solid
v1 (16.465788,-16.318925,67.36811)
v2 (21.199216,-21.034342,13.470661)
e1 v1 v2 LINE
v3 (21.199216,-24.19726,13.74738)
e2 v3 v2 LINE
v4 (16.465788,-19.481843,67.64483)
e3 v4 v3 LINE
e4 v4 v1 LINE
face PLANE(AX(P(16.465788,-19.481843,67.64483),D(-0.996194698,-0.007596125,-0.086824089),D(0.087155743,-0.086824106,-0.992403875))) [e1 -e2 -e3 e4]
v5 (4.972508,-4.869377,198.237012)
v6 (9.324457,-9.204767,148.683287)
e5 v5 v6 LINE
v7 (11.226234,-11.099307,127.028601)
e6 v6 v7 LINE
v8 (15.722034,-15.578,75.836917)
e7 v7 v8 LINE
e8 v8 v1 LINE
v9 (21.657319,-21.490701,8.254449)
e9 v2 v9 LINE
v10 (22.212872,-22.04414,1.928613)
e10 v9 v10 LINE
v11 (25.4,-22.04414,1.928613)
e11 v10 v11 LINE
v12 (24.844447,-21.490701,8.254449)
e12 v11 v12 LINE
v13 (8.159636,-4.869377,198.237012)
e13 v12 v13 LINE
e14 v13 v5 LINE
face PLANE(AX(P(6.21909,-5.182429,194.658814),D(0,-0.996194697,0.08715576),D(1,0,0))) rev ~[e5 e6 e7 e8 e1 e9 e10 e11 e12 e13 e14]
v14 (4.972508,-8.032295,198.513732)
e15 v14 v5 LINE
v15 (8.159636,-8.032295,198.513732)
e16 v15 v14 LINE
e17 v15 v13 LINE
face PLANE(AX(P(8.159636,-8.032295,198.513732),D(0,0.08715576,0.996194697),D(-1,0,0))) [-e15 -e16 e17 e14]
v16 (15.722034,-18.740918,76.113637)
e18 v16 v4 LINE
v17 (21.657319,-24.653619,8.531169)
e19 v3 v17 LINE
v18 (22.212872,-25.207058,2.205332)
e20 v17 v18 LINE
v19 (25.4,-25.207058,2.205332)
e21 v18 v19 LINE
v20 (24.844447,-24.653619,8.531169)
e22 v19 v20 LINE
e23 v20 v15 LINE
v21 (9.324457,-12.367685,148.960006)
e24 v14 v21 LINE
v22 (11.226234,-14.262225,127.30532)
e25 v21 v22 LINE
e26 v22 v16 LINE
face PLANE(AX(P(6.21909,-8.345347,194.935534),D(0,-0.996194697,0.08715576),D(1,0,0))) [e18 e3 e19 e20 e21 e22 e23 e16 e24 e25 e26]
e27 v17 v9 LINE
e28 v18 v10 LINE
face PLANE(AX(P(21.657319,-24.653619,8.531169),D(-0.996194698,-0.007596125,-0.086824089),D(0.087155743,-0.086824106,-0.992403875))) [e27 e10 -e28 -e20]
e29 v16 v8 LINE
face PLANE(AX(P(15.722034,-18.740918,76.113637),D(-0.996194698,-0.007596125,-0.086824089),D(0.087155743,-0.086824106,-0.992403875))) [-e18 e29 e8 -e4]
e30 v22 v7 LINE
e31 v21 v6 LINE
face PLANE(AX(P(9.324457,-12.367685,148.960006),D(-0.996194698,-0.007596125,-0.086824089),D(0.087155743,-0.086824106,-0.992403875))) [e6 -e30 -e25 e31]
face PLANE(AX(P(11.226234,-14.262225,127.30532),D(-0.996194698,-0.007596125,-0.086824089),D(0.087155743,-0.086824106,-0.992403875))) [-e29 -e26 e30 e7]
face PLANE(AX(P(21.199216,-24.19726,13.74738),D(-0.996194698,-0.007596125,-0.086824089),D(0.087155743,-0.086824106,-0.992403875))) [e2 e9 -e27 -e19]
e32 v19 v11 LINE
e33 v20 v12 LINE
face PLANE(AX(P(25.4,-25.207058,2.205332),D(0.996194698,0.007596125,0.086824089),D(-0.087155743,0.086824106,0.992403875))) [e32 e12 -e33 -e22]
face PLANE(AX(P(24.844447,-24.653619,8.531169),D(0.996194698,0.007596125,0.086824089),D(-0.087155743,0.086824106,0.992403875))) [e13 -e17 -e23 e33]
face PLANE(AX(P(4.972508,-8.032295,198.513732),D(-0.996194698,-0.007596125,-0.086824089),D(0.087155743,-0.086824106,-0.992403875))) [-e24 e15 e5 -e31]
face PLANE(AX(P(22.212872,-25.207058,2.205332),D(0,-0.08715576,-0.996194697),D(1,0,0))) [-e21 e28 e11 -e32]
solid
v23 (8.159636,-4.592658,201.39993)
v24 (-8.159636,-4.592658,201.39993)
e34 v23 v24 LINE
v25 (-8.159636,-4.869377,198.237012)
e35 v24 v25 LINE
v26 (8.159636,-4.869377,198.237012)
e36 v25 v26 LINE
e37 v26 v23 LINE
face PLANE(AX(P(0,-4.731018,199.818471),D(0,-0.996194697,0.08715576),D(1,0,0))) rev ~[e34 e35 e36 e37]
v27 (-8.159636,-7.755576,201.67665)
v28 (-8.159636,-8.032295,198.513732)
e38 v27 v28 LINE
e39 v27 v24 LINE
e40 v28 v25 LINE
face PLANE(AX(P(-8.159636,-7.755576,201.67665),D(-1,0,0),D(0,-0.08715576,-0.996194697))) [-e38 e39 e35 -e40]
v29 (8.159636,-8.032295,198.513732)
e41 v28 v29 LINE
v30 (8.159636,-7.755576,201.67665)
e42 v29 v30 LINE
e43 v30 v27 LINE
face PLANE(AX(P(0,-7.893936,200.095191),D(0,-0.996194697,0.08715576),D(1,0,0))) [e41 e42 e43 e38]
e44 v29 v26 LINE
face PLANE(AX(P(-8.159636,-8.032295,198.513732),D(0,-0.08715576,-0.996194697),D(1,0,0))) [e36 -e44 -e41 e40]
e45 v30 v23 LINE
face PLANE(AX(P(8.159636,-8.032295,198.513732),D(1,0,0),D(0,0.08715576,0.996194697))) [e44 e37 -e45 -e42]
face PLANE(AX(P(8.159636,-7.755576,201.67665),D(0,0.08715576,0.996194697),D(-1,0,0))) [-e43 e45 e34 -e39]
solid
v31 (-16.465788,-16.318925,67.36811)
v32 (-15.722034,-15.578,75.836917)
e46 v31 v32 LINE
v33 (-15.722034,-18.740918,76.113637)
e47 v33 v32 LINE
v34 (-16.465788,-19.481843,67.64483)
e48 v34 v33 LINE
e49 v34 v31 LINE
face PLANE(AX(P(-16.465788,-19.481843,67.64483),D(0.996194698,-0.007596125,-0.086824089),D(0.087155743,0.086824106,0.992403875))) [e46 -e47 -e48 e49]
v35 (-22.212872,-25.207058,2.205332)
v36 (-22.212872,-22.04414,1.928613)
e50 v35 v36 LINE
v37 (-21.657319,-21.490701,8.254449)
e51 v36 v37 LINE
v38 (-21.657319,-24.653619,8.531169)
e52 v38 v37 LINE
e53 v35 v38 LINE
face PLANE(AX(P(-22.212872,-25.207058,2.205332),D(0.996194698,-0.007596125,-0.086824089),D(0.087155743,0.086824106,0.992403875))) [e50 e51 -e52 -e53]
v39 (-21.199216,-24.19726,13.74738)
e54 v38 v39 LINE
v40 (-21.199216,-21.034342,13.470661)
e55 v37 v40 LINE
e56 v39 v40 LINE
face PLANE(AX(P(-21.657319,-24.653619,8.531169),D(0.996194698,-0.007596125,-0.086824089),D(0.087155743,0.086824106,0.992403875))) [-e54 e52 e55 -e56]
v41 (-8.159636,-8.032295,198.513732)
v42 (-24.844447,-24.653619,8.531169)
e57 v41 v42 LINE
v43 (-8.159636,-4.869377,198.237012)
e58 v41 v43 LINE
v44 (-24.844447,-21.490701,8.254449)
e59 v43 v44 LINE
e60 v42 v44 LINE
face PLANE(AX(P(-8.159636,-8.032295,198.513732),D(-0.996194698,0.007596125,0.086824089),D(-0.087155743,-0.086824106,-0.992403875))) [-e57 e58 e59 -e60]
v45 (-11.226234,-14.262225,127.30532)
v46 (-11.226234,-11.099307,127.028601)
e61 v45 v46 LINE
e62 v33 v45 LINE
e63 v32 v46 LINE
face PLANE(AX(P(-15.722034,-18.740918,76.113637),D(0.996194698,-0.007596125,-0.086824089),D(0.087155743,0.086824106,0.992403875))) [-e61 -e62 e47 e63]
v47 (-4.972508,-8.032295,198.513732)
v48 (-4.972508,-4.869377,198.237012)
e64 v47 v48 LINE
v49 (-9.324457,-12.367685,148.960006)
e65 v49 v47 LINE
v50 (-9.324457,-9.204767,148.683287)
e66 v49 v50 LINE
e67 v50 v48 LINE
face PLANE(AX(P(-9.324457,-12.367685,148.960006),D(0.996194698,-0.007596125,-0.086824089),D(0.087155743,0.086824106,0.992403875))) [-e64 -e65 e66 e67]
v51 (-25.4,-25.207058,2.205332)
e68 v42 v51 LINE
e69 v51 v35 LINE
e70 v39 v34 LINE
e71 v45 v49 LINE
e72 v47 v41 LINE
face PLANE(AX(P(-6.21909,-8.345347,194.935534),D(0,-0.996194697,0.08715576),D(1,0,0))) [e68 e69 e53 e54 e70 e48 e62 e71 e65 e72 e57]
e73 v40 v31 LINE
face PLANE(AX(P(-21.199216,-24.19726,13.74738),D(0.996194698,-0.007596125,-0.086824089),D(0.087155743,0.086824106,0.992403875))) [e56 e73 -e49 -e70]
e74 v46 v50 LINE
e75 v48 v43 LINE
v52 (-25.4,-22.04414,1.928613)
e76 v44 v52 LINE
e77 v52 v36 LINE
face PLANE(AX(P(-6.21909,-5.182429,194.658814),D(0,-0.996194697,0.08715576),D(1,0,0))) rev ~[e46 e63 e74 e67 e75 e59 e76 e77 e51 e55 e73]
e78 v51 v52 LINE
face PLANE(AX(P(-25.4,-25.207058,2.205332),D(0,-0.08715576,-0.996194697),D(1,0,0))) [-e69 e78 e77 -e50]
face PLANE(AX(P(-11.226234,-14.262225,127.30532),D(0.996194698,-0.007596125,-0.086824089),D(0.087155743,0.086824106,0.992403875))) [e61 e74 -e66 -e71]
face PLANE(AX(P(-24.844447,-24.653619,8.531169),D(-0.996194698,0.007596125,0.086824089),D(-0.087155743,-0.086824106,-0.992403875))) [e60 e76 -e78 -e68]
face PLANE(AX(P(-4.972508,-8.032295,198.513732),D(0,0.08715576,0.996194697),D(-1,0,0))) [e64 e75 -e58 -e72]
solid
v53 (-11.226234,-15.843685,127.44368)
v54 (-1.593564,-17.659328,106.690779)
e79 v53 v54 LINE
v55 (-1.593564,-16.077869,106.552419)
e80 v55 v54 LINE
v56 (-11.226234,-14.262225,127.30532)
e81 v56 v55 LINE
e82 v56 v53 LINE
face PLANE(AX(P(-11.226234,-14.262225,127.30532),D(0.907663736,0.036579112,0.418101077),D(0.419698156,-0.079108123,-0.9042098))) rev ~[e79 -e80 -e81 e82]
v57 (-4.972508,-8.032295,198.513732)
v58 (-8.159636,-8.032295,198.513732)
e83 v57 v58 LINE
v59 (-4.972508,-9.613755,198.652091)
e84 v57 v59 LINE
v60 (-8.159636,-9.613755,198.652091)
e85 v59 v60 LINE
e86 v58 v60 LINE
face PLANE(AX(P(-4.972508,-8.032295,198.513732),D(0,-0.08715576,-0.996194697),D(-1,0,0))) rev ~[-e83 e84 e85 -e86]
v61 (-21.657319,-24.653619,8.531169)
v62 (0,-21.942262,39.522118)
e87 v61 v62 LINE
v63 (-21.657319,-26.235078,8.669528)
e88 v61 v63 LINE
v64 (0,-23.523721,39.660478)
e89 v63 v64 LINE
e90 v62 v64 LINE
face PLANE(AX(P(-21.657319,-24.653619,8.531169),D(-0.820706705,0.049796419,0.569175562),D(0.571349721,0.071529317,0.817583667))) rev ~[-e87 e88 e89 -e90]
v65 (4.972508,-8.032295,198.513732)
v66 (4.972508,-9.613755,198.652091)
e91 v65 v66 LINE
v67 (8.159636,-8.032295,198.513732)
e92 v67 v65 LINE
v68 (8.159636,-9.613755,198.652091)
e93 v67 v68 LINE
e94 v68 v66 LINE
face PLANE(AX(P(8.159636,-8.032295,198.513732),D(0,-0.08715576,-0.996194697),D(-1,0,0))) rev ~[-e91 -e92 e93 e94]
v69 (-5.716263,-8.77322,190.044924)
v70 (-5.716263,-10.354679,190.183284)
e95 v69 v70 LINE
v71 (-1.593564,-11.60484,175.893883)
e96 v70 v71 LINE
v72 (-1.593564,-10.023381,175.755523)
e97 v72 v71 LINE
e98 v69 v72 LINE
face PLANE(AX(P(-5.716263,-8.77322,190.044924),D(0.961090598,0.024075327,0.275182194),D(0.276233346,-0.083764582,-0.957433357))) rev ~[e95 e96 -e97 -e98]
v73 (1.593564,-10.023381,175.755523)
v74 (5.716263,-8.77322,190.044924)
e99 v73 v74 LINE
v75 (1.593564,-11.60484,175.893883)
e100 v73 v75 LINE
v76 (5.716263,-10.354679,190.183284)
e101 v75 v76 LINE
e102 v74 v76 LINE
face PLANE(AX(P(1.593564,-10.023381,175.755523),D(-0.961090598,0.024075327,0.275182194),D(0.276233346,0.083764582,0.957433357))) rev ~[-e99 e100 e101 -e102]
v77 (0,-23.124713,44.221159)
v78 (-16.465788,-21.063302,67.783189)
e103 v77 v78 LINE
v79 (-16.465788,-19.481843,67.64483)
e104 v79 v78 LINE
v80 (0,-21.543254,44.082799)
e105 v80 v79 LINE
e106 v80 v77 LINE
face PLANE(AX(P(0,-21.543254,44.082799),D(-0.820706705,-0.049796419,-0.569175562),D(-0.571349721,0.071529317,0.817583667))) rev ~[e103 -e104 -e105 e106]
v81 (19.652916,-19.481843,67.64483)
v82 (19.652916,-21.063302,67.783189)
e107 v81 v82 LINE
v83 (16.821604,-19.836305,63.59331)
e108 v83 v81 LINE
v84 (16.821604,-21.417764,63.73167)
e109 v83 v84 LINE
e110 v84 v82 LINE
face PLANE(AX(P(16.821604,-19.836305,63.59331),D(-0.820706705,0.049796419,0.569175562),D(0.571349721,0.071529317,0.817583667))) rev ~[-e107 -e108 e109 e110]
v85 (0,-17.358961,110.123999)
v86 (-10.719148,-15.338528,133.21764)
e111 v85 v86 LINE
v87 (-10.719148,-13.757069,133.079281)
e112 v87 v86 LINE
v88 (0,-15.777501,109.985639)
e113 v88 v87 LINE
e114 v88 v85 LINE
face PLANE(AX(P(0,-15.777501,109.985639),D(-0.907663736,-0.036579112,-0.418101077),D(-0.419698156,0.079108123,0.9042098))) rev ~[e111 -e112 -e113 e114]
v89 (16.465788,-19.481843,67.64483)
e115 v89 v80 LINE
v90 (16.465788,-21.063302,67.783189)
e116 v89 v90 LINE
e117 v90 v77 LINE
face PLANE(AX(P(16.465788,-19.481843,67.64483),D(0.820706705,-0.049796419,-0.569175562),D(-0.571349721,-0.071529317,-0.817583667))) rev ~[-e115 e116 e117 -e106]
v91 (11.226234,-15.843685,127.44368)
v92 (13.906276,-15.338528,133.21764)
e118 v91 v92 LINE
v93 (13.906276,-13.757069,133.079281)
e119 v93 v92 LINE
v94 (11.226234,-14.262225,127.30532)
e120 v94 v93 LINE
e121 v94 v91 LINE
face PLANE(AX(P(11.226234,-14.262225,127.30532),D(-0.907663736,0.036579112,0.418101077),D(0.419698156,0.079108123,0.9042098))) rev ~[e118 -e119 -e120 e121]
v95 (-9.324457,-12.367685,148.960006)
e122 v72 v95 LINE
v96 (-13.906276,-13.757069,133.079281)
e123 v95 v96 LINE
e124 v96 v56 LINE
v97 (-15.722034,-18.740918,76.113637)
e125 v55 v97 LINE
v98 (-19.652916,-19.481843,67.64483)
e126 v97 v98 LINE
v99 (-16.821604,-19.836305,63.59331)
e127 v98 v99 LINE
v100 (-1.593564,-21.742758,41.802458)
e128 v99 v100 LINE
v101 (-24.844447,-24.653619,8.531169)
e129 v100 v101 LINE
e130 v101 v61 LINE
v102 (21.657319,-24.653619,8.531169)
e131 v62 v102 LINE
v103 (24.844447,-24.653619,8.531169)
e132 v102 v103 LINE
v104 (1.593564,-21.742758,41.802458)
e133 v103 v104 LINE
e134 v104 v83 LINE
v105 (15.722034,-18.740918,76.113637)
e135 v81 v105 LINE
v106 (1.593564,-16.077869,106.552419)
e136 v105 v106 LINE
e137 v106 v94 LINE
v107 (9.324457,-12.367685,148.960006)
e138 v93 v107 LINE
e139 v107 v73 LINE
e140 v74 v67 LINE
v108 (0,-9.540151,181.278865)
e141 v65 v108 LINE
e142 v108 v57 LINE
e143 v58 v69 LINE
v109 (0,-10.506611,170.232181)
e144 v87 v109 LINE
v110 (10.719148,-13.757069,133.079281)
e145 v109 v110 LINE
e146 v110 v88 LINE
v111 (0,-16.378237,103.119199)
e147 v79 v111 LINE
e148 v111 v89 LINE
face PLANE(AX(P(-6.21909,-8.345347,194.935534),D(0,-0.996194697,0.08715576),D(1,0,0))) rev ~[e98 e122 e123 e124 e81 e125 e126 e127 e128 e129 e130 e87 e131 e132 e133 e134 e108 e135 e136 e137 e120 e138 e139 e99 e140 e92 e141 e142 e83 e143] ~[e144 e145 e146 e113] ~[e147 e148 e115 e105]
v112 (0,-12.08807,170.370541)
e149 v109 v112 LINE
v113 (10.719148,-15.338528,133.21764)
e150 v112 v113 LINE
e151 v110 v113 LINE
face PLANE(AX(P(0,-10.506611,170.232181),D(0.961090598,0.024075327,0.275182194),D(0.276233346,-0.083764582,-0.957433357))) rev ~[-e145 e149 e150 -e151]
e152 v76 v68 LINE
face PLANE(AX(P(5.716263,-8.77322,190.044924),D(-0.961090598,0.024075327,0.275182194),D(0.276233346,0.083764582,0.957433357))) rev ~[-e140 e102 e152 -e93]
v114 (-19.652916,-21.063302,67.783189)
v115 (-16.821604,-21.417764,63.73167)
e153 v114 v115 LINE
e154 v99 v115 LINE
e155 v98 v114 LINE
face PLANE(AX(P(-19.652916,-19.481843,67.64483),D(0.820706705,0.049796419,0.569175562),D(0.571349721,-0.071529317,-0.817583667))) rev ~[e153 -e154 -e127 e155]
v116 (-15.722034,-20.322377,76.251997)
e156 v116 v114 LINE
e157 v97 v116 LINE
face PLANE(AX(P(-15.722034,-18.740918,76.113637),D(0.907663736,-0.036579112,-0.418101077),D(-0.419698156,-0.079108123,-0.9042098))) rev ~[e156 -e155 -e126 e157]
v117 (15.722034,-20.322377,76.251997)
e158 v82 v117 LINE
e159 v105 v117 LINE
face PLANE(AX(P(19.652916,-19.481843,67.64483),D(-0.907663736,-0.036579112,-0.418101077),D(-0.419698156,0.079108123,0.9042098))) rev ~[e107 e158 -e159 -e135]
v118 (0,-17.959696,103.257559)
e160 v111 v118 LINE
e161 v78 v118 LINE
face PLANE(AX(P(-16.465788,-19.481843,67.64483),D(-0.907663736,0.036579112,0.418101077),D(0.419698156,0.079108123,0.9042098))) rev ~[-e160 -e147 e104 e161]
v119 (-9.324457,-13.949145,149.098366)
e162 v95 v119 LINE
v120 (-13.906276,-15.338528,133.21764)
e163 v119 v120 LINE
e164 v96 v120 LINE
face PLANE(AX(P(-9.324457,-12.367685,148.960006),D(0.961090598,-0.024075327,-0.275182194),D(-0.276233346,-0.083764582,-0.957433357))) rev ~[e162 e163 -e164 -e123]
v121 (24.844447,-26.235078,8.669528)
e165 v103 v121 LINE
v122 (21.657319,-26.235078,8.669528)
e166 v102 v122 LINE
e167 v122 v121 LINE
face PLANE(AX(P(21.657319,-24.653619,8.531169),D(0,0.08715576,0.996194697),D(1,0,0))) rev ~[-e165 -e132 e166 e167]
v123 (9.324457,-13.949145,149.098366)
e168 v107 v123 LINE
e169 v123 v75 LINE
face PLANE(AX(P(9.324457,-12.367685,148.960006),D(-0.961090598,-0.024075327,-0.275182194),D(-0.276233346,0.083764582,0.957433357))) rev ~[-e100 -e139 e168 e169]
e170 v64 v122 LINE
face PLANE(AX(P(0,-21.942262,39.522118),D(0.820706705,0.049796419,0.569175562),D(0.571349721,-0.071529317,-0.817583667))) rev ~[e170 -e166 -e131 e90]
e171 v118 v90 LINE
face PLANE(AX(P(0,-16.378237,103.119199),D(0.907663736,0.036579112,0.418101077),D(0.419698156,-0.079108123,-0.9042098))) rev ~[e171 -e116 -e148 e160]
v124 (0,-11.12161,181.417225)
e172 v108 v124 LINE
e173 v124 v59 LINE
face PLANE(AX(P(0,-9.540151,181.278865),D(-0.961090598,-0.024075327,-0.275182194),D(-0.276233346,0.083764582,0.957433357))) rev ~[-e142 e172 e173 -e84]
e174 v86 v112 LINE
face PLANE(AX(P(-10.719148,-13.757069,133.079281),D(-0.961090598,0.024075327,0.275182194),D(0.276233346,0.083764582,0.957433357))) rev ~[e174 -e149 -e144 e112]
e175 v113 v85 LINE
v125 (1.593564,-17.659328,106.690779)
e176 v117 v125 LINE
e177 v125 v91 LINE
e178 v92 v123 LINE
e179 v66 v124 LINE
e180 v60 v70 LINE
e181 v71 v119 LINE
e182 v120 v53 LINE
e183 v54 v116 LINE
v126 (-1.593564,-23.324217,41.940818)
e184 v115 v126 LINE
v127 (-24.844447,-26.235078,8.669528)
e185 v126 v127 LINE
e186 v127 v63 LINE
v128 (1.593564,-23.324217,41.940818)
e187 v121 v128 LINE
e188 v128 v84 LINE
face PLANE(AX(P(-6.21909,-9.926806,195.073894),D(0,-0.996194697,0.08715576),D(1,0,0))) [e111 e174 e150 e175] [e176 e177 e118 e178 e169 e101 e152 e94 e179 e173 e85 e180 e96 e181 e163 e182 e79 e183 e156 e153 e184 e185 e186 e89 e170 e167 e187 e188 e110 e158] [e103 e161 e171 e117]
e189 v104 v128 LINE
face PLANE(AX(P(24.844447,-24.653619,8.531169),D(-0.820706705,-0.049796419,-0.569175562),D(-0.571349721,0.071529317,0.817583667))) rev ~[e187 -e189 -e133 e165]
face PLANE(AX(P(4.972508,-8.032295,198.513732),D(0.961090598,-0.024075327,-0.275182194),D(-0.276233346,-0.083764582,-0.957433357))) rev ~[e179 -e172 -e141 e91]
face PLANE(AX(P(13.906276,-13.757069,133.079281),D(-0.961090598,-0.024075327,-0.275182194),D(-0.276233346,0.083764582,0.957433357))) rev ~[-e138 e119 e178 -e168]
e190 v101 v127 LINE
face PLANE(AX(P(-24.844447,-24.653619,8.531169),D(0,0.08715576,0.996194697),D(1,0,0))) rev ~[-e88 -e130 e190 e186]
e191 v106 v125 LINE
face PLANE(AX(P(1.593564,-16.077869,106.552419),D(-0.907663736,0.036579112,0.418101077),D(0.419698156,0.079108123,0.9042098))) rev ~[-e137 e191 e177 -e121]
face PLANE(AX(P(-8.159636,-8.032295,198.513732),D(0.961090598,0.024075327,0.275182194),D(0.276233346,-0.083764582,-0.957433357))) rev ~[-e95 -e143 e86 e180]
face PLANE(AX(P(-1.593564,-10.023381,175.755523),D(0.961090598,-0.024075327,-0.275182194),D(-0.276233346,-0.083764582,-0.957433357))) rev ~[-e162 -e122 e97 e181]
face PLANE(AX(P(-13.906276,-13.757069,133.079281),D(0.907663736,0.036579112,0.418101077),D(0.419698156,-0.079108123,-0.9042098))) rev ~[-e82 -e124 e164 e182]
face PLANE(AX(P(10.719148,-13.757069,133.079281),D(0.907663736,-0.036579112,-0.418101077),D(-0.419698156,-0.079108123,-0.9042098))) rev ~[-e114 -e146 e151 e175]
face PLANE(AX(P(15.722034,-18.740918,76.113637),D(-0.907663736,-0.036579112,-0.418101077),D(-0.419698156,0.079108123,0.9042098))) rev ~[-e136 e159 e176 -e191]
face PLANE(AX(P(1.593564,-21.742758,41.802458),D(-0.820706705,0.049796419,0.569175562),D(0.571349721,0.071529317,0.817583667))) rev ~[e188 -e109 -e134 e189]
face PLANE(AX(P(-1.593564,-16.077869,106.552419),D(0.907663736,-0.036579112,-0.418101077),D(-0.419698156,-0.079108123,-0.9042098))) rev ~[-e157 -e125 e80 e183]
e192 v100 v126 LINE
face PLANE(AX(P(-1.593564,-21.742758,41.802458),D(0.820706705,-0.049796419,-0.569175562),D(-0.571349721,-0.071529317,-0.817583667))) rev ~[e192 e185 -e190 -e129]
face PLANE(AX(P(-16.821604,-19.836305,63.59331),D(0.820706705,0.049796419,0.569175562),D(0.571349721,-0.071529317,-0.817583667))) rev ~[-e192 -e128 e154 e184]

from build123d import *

# Parameters (mm, degrees)
F5_DEPTH = 3.175
F6_DEPTH = 3.175
F7_DEPTH = 1.5875


with BuildPart() as f5:
    # F4 (on line) → F5 (new body)
    with BuildSketch(Plane(origin=(0, -25.2070583861, 2.2053322939), x_dir=(1, 0, 0), z_dir=(0, -0.9961946966, 0.0871557602))):
        Polygon((-8.1596356954, 200.2332657202), (-8.1596356954, 197.0582657202), (-4.9725077112, 197.0582657202), (4.9725077112, 197.0582657202), (8.1596356954, 197.0582657202), (8.1596356954, 200.2332657202), align=None)
    extrude(amount=-F5_DEPTH)


with BuildPart() as f6:
    # F4 (on line) → F6 (new body)
    with BuildSketch(Plane(origin=(0, -25.2070583861, 2.2053322939), x_dir=(1, 0, 0), z_dir=(0, -0.9961946966, 0.0871557602))):
        Polygon((-4.9725077112, 197.0582657202), (-8.1596356954, 197.0582657202), (-5.7162625489, 188.5571090249), align=None)
        Polygon((-5.7162625489, 188.5571090249), (-8.1596356954, 197.0582657202), (-13.9062760659, 131.3738657202), (-9.3244573772, 147.3152534193), align=None)
        Polygon((-9.3244573772, 147.3152534193), (-13.9062760659, 131.3738657202), (-10.7191480817, 131.3738657202), align=None)
        Polygon((-10.7191480817, 131.3738657202), (-13.9062760659, 131.3738657202), (-11.2262337703, 125.5778497774), align=None)
        Polygon((-11.2262337703, 125.5778497774), (-13.9062760659, 131.3738657202), (-19.6529164364, 65.6894657202), (-15.7220336145, 74.1906224154), align=None)
        Polygon((-15.7220336145, 74.1906224154), (-19.6529164364, 65.6894657202), (-16.4657884522, 65.6894657202), align=None)
        Polygon((-16.4657884522, 65.6894657202), (-19.6529164364, 65.6894657202), (-16.8216044507, 61.6224702472), align=None)
        Polygon((-16.8216044507, 61.6224702472), (-19.6529164364, 65.6894657202), (-24.8444469866, 6.35), (-21.1992164113, 11.5861365765), align=None)
        Polygon((-21.1992164113, 11.5861365765), (-24.8444469866, 6.35), (-21.6573190024, 6.35), align=None)
        Polygon((-21.6573190024, 6.35), (-24.8444469866, 6.35), (-25.4, 0), (-22.2370818336, 0), (-22.2128720158, 0), align=None)
    extrude(amount=-F6_DEPTH)


with BuildPart() as f6b:
    # F4 (on line) → F6, piece 2 (new body)
    with BuildSketch(Plane(origin=(0, -25.2070583861, 2.2053322939), x_dir=(1, 0, 0), z_dir=(0, -0.9961946966, 0.0871557602))):
        Polygon((8.1596356954, 197.0582657202), (4.9725077112, 197.0582657202), (5.7162625489, 188.5571090249), align=None)
        Polygon((8.1596356954, 197.0582657202), (5.7162625489, 188.5571090249), (9.3244573772, 147.3152534193), (13.9062760659, 131.3738657202), align=None)
        Polygon((9.3244573772, 147.3152534193), (10.7191480817, 131.3738657202), (13.9062760659, 131.3738657202), align=None)
        Polygon((13.9062760659, 131.3738657202), (10.7191480817, 131.3738657202), (11.2262337703, 125.5778497774), align=None)
        Polygon((19.6529164364, 65.6894657202), (13.9062760659, 131.3738657202), (11.2262337703, 125.5778497774), (15.7220336145, 74.1906224154), align=None)
        Polygon((15.7220336145, 74.1906224154), (16.4657884522, 65.6894657202), (19.6529164364, 65.6894657202), align=None)
        Polygon((19.6529164364, 65.6894657202), (16.4657884522, 65.6894657202), (16.8216044507, 61.6224702472), align=None)
        Polygon((24.8444469866, 6.35), (19.6529164364, 65.6894657202), (16.8216044507, 61.6224702472), (21.1992164113, 11.5861365765), align=None)
        Polygon((21.1992164113, 11.5861365765), (21.6573190024, 6.35), (24.8444469866, 6.35), align=None)
        Polygon((24.8444469866, 6.35), (21.6573190024, 6.35), (22.2128720158, 0), (25.4, 0), align=None)
    extrude(amount=-F6_DEPTH)


with BuildPart() as f7:
    # F4 (on line) → F7 (new body)
    with BuildSketch(Plane(origin=(0, -25.2070583861, 2.2053322939), x_dir=(1, 0, 0), z_dir=(0, -0.9961946966, 0.0871557602))):
        Polygon((-4.9725077112, 197.0582657202), (-8.1596356954, 197.0582657202), (-5.7162625489, 188.5571090249), align=None)
        Polygon((0, 179.7575651368), (-4.9725077112, 197.0582657202), (-5.7162625489, 188.5571090249), (-1.5935639921, 174.213124567), align=None)
        Polygon((5.7162625489, 188.5571090249), (4.9725077112, 197.0582657202), (0, 179.7575651368), (1.5935639921, 174.213124567), align=None)
        Polygon((8.1596356954, 197.0582657202), (4.9725077112, 197.0582657202), (5.7162625489, 188.5571090249), align=None)
        Polygon((1.5935639921, 174.213124567), (0, 179.7575651368), (-1.5935639921, 174.213124567), (0, 168.6686839972), align=None)
        Polygon((-9.3244573772, 147.3152534193), (-10.7191480817, 131.3738657202), (0, 168.6686839972), (-1.5935639921, 174.213124567), align=None)
        Polygon((-9.3244573772, 147.3152534193), (-13.9062760659, 131.3738657202), (-10.7191480817, 131.3738657202), align=None)
        Polygon((1.5935639921, 174.213124567), (0, 168.6686839972), (10.7191480817, 131.3738657202), (9.3244573772, 147.3152534193), align=None)
        Polygon((9.3244573772, 147.3152534193), (10.7191480817, 131.3738657202), (13.9062760659, 131.3738657202), align=None)
        Polygon((10.7191480817, 131.3738657202), (0, 108.1920102412), (1.5935639921, 104.7456757116), (11.2262337703, 125.5778497774), align=None)
        Polygon((13.9062760659, 131.3738657202), (10.7191480817, 131.3738657202), (11.2262337703, 125.5778497774), align=None)
        Polygon((-10.7191480817, 131.3738657202), (-11.2262337703, 125.5778497774), (-1.5935639921, 104.7456757116), (0, 108.1920102412), align=None)
        Polygon((-10.7191480817, 131.3738657202), (-13.9062760659, 131.3738657202), (-11.2262337703, 125.5778497774), align=None)
        Polygon((0, 108.1920102412), (-1.5935639921, 104.7456757116), (0, 101.299341182), (1.5935639921, 104.7456757116), align=None)
        Polygon((-15.7220336145, 74.1906224154), (-16.4657884522, 65.6894657202), (0, 101.299341182), (-1.5935639921, 104.7456757116), align=None)
        Polygon((1.5935639921, 104.7456757116), (0, 101.299341182), (16.4657884522, 65.6894657202), (15.7220336145, 74.1906224154), align=None)
        Polygon((15.7220336145, 74.1906224154), (16.4657884522, 65.6894657202), (19.6529164364, 65.6894657202), align=None)
        Polygon((19.6529164364, 65.6894657202), (16.4657884522, 65.6894657202), (16.8216044507, 61.6224702472), align=None)
        Polygon((16.4657884522, 65.6894657202), (0, 42.0374318105), (1.5935639921, 39.7483808071), (16.8216044507, 61.6224702472), align=None)
        Polygon((-15.7220336145, 74.1906224154), (-19.6529164364, 65.6894657202), (-16.4657884522, 65.6894657202), align=None)
        Polygon((-16.4657884522, 65.6894657202), (-19.6529164364, 65.6894657202), (-16.8216044507, 61.6224702472), align=None)
        Polygon((-16.4657884522, 65.6894657202), (-16.8216044507, 61.6224702472), (-1.5935639921, 39.7483808071), (0, 42.0374318105), align=None)
        Polygon((0, 42.0374318105), (-1.5935639921, 39.7483808071), (0, 37.4593298037), (1.5935639921, 39.7483808071), align=None)
        Polygon((-1.5935639921, 39.7483808071), (-21.1992164113, 11.5861365765), (-21.6573190024, 6.35), (0, 37.4593298037), align=None)
        Polygon((1.5935639921, 39.7483808071), (0, 37.4593298037), (21.6573190024, 6.35), (21.1992164113, 11.5861365765), align=None)
        Polygon((-21.1992164113, 11.5861365765), (-24.8444469866, 6.35), (-21.6573190024, 6.35), align=None)
        Polygon((21.1992164113, 11.5861365765), (21.6573190024, 6.35), (24.8444469866, 6.35), align=None)
    extrude(amount=F7_DEPTH)


solid = Compound([f5.part, f6.part, f6b.part, f7.part])
